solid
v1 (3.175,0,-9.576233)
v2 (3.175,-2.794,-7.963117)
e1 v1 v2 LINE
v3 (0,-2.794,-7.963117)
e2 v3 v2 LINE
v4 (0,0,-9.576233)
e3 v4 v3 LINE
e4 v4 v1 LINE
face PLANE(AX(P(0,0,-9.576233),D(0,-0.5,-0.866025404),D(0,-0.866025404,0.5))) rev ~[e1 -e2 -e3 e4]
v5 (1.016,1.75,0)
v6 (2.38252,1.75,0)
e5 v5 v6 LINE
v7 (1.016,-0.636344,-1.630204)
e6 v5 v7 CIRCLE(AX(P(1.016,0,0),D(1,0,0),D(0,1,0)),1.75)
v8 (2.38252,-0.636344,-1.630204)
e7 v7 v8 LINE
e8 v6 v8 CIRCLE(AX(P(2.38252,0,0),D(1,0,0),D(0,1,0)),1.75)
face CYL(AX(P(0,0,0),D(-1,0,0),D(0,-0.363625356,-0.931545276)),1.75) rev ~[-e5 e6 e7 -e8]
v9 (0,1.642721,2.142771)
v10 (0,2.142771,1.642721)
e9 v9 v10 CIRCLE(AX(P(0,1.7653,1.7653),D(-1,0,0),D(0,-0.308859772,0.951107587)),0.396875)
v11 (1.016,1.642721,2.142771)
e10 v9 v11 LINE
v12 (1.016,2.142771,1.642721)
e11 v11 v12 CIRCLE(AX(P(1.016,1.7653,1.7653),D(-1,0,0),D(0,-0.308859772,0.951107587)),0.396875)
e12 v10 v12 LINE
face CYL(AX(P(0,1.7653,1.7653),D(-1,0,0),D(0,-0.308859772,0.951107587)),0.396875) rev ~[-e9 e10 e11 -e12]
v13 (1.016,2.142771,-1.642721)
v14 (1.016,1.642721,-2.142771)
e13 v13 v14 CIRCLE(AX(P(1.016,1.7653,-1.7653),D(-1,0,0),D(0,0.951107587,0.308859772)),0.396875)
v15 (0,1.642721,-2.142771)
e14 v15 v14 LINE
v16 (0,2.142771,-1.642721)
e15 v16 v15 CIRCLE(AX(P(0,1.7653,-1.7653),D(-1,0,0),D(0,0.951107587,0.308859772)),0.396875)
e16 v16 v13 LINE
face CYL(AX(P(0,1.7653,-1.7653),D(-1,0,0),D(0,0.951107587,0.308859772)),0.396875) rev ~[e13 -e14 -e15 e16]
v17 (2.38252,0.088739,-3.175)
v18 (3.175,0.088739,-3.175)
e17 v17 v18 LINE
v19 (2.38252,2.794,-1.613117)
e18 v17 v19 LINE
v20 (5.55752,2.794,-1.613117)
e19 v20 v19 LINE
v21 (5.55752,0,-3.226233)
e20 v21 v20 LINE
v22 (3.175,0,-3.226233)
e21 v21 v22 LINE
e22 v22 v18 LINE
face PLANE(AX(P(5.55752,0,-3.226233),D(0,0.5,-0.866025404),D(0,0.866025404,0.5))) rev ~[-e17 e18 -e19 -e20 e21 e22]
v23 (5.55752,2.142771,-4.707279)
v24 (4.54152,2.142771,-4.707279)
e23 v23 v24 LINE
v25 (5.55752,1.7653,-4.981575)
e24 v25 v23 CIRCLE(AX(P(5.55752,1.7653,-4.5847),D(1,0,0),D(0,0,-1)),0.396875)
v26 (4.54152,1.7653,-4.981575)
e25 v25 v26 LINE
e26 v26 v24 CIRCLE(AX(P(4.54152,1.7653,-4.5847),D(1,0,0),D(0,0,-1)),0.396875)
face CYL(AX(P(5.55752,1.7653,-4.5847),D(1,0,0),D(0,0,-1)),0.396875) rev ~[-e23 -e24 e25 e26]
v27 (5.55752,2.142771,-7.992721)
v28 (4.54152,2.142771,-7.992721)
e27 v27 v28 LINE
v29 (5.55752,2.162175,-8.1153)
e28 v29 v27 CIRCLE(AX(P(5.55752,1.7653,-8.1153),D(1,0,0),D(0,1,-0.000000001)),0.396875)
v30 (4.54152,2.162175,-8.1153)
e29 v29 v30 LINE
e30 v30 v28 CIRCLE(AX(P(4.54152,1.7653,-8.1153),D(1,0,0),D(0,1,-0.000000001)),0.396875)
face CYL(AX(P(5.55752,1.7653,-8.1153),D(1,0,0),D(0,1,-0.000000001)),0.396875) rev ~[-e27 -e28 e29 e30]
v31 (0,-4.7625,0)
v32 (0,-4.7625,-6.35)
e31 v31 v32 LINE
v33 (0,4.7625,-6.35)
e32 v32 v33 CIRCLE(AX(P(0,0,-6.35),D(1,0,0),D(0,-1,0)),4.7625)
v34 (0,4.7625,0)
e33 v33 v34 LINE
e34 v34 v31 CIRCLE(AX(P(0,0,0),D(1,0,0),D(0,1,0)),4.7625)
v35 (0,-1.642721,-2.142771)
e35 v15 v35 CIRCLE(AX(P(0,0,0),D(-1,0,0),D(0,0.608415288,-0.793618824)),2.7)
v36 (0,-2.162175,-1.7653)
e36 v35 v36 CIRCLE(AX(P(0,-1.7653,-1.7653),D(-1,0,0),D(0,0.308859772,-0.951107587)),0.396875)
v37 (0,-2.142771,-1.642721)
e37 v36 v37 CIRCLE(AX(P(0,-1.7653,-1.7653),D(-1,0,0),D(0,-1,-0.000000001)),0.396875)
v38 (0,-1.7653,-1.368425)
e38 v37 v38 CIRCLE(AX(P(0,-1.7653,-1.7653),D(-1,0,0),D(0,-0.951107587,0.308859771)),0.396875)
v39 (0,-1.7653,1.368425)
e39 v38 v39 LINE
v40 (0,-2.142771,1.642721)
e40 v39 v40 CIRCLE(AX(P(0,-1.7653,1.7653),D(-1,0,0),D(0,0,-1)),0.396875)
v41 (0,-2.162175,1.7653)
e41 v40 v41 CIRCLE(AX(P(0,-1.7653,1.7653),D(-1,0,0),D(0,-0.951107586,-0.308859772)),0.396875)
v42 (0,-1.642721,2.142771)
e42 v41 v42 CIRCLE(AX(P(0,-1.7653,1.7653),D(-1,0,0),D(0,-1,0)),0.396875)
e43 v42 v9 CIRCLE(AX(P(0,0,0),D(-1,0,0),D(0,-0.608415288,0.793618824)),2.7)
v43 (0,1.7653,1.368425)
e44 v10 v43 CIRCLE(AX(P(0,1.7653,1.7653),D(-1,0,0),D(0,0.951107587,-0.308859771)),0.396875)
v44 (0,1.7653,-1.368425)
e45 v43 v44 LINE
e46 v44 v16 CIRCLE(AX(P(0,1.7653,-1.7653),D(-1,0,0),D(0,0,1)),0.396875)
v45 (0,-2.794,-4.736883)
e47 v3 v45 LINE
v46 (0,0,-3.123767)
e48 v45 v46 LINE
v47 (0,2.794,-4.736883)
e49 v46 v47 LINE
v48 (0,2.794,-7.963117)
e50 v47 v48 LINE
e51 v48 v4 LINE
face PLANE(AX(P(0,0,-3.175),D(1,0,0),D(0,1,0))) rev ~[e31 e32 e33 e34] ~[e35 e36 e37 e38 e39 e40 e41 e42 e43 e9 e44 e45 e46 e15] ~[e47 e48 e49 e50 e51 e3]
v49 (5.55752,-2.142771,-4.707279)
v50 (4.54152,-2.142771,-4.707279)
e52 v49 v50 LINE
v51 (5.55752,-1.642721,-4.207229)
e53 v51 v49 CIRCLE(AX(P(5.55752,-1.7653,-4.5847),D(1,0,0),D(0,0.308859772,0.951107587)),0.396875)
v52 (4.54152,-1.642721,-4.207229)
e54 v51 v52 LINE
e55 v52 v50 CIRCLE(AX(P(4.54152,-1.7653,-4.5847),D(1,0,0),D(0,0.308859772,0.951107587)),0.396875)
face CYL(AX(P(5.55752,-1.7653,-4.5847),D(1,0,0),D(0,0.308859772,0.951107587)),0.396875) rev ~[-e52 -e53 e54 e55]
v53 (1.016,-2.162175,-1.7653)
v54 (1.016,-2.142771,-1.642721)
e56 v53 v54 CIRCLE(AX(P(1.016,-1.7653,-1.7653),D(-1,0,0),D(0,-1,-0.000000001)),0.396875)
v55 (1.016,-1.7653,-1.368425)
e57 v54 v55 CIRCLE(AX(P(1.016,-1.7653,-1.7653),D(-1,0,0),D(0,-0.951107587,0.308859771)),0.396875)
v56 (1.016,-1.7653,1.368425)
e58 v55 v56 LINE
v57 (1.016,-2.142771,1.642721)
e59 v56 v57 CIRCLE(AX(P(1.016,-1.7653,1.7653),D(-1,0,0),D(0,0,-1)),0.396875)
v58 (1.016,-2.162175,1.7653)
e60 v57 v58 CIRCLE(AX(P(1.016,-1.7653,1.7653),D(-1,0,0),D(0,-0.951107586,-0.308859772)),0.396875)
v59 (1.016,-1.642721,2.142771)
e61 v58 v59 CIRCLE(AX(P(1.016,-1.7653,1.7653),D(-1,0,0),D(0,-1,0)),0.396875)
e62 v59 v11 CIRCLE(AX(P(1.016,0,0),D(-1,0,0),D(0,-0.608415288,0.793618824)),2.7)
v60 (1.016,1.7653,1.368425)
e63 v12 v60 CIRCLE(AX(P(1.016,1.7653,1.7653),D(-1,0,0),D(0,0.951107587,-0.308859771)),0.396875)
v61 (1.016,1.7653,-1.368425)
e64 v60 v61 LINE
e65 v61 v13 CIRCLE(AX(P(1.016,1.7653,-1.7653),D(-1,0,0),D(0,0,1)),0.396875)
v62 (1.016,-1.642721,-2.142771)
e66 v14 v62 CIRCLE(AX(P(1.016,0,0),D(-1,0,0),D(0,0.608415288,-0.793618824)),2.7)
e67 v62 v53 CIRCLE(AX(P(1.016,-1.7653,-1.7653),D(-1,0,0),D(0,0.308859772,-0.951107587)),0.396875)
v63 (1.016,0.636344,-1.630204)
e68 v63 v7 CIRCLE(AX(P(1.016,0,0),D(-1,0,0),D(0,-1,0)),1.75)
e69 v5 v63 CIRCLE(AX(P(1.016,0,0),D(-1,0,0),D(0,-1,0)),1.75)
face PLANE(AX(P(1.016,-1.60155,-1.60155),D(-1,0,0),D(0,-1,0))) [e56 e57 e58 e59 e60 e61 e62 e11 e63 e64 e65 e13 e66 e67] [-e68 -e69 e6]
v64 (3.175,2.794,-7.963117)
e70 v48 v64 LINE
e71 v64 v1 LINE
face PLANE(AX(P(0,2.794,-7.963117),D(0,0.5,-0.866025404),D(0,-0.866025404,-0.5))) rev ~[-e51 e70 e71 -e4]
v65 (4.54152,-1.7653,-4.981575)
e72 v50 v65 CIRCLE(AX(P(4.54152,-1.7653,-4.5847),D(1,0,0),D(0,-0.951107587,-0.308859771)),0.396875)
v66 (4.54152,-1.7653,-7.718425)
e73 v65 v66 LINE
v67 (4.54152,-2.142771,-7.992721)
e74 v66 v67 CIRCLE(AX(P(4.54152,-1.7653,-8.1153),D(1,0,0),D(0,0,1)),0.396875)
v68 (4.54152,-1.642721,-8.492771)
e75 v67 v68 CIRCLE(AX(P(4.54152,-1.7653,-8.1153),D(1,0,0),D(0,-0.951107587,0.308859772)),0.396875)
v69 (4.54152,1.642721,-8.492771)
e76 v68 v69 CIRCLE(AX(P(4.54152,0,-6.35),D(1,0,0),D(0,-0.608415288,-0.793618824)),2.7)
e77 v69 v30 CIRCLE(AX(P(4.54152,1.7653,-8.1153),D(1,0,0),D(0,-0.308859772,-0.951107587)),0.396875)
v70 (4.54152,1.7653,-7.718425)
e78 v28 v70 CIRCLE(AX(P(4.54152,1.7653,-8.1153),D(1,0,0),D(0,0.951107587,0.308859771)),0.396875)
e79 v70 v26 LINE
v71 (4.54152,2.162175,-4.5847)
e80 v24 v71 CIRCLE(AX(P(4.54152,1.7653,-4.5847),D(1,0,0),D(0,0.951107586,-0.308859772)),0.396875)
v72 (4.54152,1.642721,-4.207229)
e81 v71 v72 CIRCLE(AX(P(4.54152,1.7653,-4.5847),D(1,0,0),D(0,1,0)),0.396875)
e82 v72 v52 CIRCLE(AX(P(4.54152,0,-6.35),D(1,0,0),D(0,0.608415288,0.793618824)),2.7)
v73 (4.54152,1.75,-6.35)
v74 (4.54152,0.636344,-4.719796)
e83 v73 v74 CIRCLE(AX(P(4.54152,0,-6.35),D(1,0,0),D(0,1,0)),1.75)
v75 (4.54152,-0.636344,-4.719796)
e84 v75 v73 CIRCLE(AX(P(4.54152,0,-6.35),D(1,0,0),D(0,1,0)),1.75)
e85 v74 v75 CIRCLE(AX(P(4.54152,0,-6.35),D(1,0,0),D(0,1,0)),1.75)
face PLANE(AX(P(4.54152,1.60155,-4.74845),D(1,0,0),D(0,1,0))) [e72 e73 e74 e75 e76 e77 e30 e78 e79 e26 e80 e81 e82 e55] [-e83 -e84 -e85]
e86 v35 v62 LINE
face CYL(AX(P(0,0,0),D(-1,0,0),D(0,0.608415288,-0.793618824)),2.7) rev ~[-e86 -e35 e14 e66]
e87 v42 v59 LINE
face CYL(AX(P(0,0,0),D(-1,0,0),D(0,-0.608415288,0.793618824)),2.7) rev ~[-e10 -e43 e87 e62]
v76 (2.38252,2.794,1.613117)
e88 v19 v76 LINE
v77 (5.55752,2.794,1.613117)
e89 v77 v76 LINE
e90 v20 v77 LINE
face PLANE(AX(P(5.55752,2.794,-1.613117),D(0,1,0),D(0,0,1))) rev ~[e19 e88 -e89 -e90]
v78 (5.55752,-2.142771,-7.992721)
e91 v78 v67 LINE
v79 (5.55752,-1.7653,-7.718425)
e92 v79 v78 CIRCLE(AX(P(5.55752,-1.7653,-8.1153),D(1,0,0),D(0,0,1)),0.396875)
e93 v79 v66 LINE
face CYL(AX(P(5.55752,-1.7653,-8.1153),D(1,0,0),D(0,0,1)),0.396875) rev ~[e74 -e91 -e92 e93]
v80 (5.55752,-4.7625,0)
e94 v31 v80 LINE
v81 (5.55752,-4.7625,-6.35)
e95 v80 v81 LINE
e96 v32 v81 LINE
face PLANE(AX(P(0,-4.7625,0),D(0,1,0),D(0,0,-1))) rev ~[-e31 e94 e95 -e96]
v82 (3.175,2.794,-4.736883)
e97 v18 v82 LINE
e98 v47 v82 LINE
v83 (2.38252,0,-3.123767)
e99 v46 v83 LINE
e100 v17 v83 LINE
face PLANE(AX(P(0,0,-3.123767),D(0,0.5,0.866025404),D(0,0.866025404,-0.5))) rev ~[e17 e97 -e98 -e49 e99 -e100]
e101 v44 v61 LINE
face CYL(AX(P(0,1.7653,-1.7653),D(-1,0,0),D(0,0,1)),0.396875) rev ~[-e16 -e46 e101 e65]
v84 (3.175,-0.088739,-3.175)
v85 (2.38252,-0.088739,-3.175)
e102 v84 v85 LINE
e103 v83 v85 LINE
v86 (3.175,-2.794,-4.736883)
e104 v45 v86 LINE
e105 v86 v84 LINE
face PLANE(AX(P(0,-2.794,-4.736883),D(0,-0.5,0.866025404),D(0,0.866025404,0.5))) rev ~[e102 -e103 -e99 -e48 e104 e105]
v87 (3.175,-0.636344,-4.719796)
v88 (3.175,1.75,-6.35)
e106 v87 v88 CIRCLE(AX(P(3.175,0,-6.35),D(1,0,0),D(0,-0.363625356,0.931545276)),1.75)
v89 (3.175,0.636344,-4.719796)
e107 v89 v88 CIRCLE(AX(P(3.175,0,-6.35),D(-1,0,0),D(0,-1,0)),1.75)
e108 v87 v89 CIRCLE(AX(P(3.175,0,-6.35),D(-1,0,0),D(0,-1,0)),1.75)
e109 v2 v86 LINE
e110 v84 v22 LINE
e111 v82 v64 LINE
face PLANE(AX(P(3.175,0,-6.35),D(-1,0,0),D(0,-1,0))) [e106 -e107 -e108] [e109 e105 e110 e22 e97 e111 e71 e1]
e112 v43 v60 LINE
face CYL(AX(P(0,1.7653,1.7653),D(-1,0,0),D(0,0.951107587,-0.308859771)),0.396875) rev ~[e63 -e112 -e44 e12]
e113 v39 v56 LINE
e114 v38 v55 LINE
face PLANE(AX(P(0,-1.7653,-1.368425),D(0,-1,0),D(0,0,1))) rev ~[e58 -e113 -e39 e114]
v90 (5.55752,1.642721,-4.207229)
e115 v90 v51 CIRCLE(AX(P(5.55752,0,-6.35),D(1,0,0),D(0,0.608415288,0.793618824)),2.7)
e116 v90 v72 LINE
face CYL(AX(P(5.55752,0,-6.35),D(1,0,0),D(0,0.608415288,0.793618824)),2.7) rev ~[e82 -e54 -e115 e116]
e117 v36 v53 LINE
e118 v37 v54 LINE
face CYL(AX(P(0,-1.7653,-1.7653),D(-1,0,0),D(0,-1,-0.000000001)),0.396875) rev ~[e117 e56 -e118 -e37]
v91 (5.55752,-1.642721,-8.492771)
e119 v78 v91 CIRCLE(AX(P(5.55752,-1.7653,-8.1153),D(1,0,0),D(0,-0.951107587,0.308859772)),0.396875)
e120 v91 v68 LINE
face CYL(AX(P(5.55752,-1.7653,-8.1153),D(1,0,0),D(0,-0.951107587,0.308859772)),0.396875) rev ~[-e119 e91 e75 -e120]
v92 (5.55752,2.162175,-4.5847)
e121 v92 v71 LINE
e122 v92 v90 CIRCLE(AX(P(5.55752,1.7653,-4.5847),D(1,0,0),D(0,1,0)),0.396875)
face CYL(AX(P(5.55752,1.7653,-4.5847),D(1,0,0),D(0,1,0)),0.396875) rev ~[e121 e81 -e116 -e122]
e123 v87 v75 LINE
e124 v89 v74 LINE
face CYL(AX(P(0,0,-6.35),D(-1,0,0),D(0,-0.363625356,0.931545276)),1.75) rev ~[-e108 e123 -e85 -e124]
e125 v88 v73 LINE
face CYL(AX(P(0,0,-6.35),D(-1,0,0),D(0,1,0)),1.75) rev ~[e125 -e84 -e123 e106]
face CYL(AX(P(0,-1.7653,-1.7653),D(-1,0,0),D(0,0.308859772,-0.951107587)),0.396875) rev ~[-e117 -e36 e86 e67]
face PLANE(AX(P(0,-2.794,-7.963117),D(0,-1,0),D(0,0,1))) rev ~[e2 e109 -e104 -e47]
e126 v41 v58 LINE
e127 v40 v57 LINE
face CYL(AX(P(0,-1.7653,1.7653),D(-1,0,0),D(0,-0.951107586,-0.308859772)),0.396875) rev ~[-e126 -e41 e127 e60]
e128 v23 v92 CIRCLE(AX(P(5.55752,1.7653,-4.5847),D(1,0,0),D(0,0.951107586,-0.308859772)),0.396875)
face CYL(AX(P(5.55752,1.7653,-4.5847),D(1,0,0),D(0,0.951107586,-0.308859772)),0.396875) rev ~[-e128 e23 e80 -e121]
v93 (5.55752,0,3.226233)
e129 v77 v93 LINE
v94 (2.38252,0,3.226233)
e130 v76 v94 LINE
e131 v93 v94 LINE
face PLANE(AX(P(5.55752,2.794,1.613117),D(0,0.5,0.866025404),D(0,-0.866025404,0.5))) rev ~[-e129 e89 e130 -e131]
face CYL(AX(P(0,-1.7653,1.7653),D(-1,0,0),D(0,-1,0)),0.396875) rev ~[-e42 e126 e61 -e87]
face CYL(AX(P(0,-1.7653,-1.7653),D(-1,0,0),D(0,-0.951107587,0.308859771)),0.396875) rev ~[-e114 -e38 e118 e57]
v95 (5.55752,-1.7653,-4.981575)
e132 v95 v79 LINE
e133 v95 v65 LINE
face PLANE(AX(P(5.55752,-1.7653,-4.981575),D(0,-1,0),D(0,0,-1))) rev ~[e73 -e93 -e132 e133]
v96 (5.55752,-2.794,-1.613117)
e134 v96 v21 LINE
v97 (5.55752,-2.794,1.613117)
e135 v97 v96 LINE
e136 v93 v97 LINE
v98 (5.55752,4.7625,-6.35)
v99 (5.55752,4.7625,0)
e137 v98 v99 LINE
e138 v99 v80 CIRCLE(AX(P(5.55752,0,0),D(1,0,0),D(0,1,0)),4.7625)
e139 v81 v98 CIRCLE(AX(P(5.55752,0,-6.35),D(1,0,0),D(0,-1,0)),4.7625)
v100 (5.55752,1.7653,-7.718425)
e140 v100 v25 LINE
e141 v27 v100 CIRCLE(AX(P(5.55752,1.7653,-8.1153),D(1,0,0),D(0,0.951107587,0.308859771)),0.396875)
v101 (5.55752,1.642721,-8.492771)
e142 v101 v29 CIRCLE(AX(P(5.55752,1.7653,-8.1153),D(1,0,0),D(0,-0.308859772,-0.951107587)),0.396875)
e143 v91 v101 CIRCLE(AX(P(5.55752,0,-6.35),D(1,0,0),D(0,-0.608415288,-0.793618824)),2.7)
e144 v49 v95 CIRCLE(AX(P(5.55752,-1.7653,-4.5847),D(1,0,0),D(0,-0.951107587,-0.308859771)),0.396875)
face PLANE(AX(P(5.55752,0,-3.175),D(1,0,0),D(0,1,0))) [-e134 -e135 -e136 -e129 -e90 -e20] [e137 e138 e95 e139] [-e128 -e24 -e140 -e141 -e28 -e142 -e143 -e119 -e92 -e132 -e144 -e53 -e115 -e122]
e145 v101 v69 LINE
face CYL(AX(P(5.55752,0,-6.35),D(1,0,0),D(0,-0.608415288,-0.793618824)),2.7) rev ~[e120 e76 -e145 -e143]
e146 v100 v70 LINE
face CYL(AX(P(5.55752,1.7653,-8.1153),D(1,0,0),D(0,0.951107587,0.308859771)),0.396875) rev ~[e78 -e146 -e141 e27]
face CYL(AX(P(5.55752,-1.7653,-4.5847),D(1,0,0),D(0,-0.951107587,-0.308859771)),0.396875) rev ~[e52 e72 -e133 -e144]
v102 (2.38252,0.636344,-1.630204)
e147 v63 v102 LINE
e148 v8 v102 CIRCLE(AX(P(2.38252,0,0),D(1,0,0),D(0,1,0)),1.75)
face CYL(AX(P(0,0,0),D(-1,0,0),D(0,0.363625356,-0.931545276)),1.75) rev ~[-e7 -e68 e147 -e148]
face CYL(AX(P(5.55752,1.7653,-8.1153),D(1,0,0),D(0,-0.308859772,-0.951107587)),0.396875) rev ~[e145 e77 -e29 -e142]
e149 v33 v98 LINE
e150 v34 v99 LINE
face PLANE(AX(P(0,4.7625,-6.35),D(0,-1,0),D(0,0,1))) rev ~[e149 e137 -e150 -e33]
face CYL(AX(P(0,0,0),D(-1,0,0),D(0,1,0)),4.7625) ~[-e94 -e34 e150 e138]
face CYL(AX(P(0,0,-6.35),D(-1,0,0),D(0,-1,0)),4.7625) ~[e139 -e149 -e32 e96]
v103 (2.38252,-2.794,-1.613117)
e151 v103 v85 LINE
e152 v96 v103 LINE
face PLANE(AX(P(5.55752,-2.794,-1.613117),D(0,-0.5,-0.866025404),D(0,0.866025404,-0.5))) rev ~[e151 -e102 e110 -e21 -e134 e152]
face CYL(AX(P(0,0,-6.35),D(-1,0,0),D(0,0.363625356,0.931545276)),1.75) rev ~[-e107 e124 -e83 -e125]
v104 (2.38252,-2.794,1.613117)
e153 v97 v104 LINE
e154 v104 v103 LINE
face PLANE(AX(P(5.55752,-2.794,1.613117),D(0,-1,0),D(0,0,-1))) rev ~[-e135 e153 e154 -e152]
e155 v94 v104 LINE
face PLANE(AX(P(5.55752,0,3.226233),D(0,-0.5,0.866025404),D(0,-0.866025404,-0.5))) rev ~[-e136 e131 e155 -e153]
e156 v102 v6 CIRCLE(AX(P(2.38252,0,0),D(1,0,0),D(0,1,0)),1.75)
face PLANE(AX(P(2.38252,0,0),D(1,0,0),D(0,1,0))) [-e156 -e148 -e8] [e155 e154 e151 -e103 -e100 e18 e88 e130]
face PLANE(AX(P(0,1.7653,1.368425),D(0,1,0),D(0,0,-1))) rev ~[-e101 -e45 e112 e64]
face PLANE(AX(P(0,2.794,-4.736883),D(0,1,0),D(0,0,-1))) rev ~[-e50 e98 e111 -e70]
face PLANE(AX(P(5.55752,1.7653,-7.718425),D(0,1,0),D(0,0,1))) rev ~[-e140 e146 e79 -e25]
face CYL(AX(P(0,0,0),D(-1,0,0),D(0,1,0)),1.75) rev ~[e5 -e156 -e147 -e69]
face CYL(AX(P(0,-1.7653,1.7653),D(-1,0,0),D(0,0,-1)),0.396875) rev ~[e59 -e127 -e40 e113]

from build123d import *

# Parameters (mm, degrees)
F1_DEPTH = 5.55752
F2_R     = 1.75
F3_DEPTH = 1.016
F4_R     = 1.75
F5_DEPTH = 1.016
F6_DEPTH = 3.175
F7_DEPTH = 3.175


# Not quite as in the source:
# - a feature names something its author has since deleted; it is built from what else it names


with BuildPart() as f1:
    # F0 (on Right) → F1 (new body)
    with BuildSketch(Plane.YZ):
        with BuildLine():
            ThreePointArc((0.636344373, -4.7197957677), (2.2310225415, -4.2076055743), (3.5497579143, -3.175))
            ThreePointArc((3.5497579143, -3.175), (2.2310225415, -2.1423944257), (0.636344373, -1.6302042323))
            ThreePointArc((0.636344373, -1.6302042323), (0, -1.75), (-0.636344373, -1.6302042323))
            ThreePointArc((-0.636344373, -1.6302042323), (-2.2310225415, -2.1423944257), (-3.5497579143, -3.175))
            ThreePointArc((-3.5497579143, -3.175), (-2.2310225415, -4.2076055743), (-0.636344373, -4.7197957677))
            ThreePointArc((-0.636344373, -4.7197957677), (0, -4.6), (0.636344373, -4.7197957677))
        make_face()
        with BuildLine():
            ThreePointArc((3.5497579143, -3.175), (4.4489958596, -1.6993652025), (4.7625, 0))
            ThreePointArc((4.7625, 0), (0, 4.7625), (-4.7625, 0))
            ThreePointArc((-4.7625, 0), (-4.4489958596, -1.6993652025), (-3.5497579143, -3.175))
            ThreePointArc((-3.5497579143, -3.175), (-2.2310225415, -2.1423944257), (-0.636344373, -1.6302042323))
            ThreePointArc((-0.636344373, -1.6302042323), (-0.9871416685, 1.4450091094), (1.75, 0))
            ThreePointArc((1.75, 0), (1.4450091094, -0.9871416685), (0.636344373, -1.6302042323))
            ThreePointArc((0.636344373, -1.6302042323), (2.2310225415, -2.1423944257), (3.5497579143, -3.175))
        make_face()
        with BuildLine():
            Line((4.7625, -6.35), (4.7625, 0))
            ThreePointArc((4.7625, 0), (4.4489958596, -1.6993652025), (3.5497579143, -3.175))
            ThreePointArc((3.5497579143, -3.175), (4.4489958596, -4.6506347975), (4.7625, -6.35))
        make_face()
        with BuildLine():
            ThreePointArc((4.7625, -6.35), (4.4489958596, -4.6506347975), (3.5497579143, -3.175))
            ThreePointArc((3.5497579143, -3.175), (2.2310225415, -4.2076055743), (0.636344373, -4.7197957677))
            ThreePointArc((0.636344373, -4.7197957677), (1.4450091094, -5.3628583315), (1.75, -6.35))
            ThreePointArc((1.75, -6.35), (-0.9871416685, -7.7950091094), (-0.636344373, -4.7197957677))
            ThreePointArc((-0.636344373, -4.7197957677), (-2.2310225415, -4.2076055743), (-3.5497579143, -3.175))
            ThreePointArc((-3.5497579143, -3.175), (-4.4489958596, -4.6506347975), (-4.7625, -6.35))
            ThreePointArc((-4.7625, -6.35), (0, -11.1125), (4.7625, -6.35))
        make_face()
        with BuildLine():
            ThreePointArc((-3.5497579143, -3.175), (-4.4489958596, -1.6993652025), (-4.7625, 0))
            Line((-4.7625, 0), (-4.7625, -6.35))
            ThreePointArc((-4.7625, -6.35), (-4.4489958596, -4.6506347975), (-3.5497579143, -3.175))
        make_face()
    extrude(amount=F1_DEPTH)

    # F2 (on face) → F3 (cut)
    with BuildSketch(Plane.YZ.offset(5.55752)):
        with BuildLine():
            ThreePointArc((1.368425, -4.5847), (1.4846669962, -4.8653330038), (1.7653, -4.981575))
            Line((1.7653, -4.981575), (1.7653, -4.5847))
            Line((1.7653, -4.5847), (1.368425, -4.5847))
        make_face()
        with BuildLine():
            Line((1.7653, -4.5847), (1.7653, -4.981575))
            ThreePointArc((1.7653, -4.981575), (1.9986038099, -4.9057593371), (2.1427708235, -4.7072787218))
            ThreePointArc((2.1427708235, -4.7072787218), (1.9091883092, -4.4408116908), (1.6427212782, -4.2072291765))
            ThreePointArc((1.6427212782, -4.2072291765), (1.4442406629, -4.3513961901), (1.368425, -4.5847))
            Line((1.368425, -4.5847), (1.7653, -4.5847))
        make_face()
        with BuildLine():
            ThreePointArc((1.7653, -7.718425), (1.4846669962, -7.8346669962), (1.368425, -8.1153))
            Line((1.368425, -8.1153), (1.7653, -8.1153))
            Line((1.7653, -8.1153), (1.7653, -7.718425))
        make_face()
        with BuildLine():
            Line((1.7653, -8.1153), (1.368425, -8.1153))
            ThreePointArc((1.368425, -8.1153), (1.4442406629, -8.3486038099), (1.6427212782, -8.4927708235))
            ThreePointArc((1.6427212782, -8.4927708235), (1.9091883092, -8.2591883092), (2.1427708235, -7.9927212782))
            ThreePointArc((2.1427708235, -7.9927212782), (1.9986038099, -7.7942406629), (1.7653, -7.718425))
            Line((1.7653, -7.718425), (1.7653, -8.1153))
        make_face()
        with BuildLine():
            Line((-1.368425, -8.1153), (-1.7653, -8.1153))
            Line((-1.7653, -8.1153), (-1.7653, -7.718425))
            ThreePointArc((-1.7653, -7.718425), (-1.9986038099, -7.7942406629), (-2.1427708235, -7.9927212782))
            ThreePointArc((-2.1427708235, -7.9927212782), (-1.9091883092, -8.2591883092), (-1.6427212782, -8.4927708235))
            ThreePointArc((-1.6427212782, -8.4927708235), (-1.4442406629, -8.3486038099), (-1.368425, -8.1153))
        make_face()
        with BuildLine():
            Line((-1.7653, -7.718425), (-1.7653, -8.1153))
            Line((-1.7653, -8.1153), (-1.368425, -8.1153))
            ThreePointArc((-1.368425, -8.1153), (-1.4846669962, -7.8346669962), (-1.7653, -7.718425))
        make_face()
        with BuildLine():
            Line((-1.7653, -4.5847), (-1.7653, -4.981575))
            ThreePointArc((-1.7653, -4.981575), (-1.4846669962, -4.8653330038), (-1.368425, -4.5847))
            Line((-1.368425, -4.5847), (-1.7653, -4.5847))
        make_face()
        with BuildLine():
            ThreePointArc((-2.1427708235, -4.7072787218), (-1.9986038099, -4.9057593371), (-1.7653, -4.981575))
            Line((-1.7653, -4.981575), (-1.7653, -4.5847))
            Line((-1.7653, -4.5847), (-1.368425, -4.5847))
            ThreePointArc((-1.368425, -4.5847), (-1.4442406629, -4.3513961901), (-1.6427212782, -4.2072291765))
            ThreePointArc((-1.6427212782, -4.2072291765), (-1.9091883092, -4.4408116908), (-2.1427708235, -4.7072787218))
        make_face()
        with BuildLine():
            ThreePointArc((-1.7653, -7.718425), (-1.4846669962, -7.8346669962), (-1.368425, -8.1153))
            Line((-1.368425, -8.1153), (1.368425, -8.1153))
            ThreePointArc((1.368425, -8.1153), (1.4846669962, -7.8346669962), (1.7653, -7.718425))
            Line((1.7653, -7.718425), (1.7653, -4.981575))
            ThreePointArc((1.7653, -4.981575), (1.4846669962, -4.8653330038), (1.368425, -4.5847))
            Line((1.368425, -4.5847), (-1.368425, -4.5847))
            ThreePointArc((-1.368425, -4.5847), (-1.4846669962, -4.8653330038), (-1.7653, -4.981575))
            Line((-1.7653, -4.981575), (-1.7653, -7.718425))
        make_face()
        with Locations((0, -6.35)):
            Circle(F2_R, mode=Mode.SUBTRACT)
        with BuildLine():
            ThreePointArc((-1.6427212782, -4.2072291765), (-2.0459330038, -4.3040669962), (-2.1427708235, -4.7072787218))
            ThreePointArc((-2.1427708235, -4.7072787218), (-1.9091883092, -4.4408116908), (-1.6427212782, -4.2072291765))
        make_face()
        with BuildLine():
            ThreePointArc((1.6427212782, -4.2072291765), (1.9091883092, -4.4408116908), (2.1427708235, -4.7072787218))
            ThreePointArc((2.1427708235, -4.7072787218), (2.1572939405, -4.6467525283), (2.162175, -4.5847))
            ThreePointArc((2.162175, -4.5847), (1.9986038099, -4.2636406629), (1.6427212782, -4.2072291765))
        make_face()
        with BuildLine():
            ThreePointArc((2.1427708235, -7.9927212782), (1.9091883092, -8.2591883092), (1.6427212782, -8.4927708235))
            ThreePointArc((1.6427212782, -8.4927708235), (1.9986038099, -8.4363593371), (2.162175, -8.1153))
            ThreePointArc((2.162175, -8.1153), (2.1572939405, -8.0532474717), (2.1427708235, -7.9927212782))
        make_face()
        with BuildLine():
            ThreePointArc((-2.1427708235, -7.9927212782), (-2.0459330038, -8.3959330038), (-1.6427212782, -8.4927708235))
            ThreePointArc((-1.6427212782, -8.4927708235), (-1.9091883092, -8.2591883092), (-2.1427708235, -7.9927212782))
        make_face()
        with BuildLine():
            ThreePointArc((-1.6427212782, -4.2072291765), (-1.4442406629, -4.3513961901), (-1.368425, -4.5847))
            Line((-1.368425, -4.5847), (1.368425, -4.5847))
            ThreePointArc((1.368425, -4.5847), (1.4442406629, -4.3513961901), (1.6427212782, -4.2072291765))
            ThreePointArc((1.6427212782, -4.2072291765), (0, -3.65), (-1.6427212782, -4.2072291765))
        make_face()
        with BuildLine():
            Line((1.368425, -8.1153), (-1.368425, -8.1153))
            ThreePointArc((-1.368425, -8.1153), (-1.4442406629, -8.3486038099), (-1.6427212782, -8.4927708235))
            ThreePointArc((-1.6427212782, -8.4927708235), (0, -9.05), (1.6427212782, -8.4927708235))
            ThreePointArc((1.6427212782, -8.4927708235), (1.4442406629, -8.3486038099), (1.368425, -8.1153))
        make_face()
    extrude(amount=-F3_DEPTH, mode=Mode.SUBTRACT)

    # F4 (on face) → F5 (cut)
    with BuildSketch(Plane(origin=(0, 0, 0), x_dir=(0, -1, 0), z_dir=(-1, 0, 0))):
        with BuildLine():
            ThreePointArc((1.7653, -1.368425), (1.4846669962, -1.4846669962), (1.368425, -1.7653))
            Line((1.368425, -1.7653), (1.7653, -1.7653))
            Line((1.7653, -1.7653), (1.7653, -1.368425))
        make_face()
        with BuildLine():
            Line((1.7653, -1.7653), (1.368425, -1.7653))
            ThreePointArc((1.368425, -1.7653), (1.4442406629, -1.9986038099), (1.6427212782, -2.1427708235))
            ThreePointArc((1.6427212782, -2.1427708235), (1.9091883092, -1.9091883092), (2.1427708235, -1.6427212782))
            ThreePointArc((2.1427708235, -1.6427212782), (1.9986038099, -1.4442406629), (1.7653, -1.368425))
            Line((1.7653, -1.368425), (1.7653, -1.7653))
        make_face()
        with BuildLine():
            Line((-1.7653, -1.368425), (-1.7653, -1.7653))
            Line((-1.7653, -1.7653), (-1.368425, -1.7653))
            ThreePointArc((-1.368425, -1.7653), (-1.4846669962, -1.4846669962), (-1.7653, -1.368425))
        make_face()
        with BuildLine():
            Line((-1.368425, -1.7653), (-1.7653, -1.7653))
            Line((-1.7653, -1.7653), (-1.7653, -1.368425))
            ThreePointArc((-1.7653, -1.368425), (-1.9986038099, -1.4442406629), (-2.1427708235, -1.6427212782))
            ThreePointArc((-2.1427708235, -1.6427212782), (-1.9091883092, -1.9091883092), (-1.6427212782, -2.1427708235))
            ThreePointArc((-1.6427212782, -2.1427708235), (-1.4442406629, -1.9986038099), (-1.368425, -1.7653))
        make_face()
        with BuildLine():
            Line((-1.7653, 1.7653), (-1.7653, 1.368425))
            ThreePointArc((-1.7653, 1.368425), (-1.4846669962, 1.4846669962), (-1.368425, 1.7653))
            Line((-1.368425, 1.7653), (-1.7653, 1.7653))
        make_face()
        with BuildLine():
            ThreePointArc((-2.1427708235, 1.6427212782), (-1.9986038099, 1.4442406629), (-1.7653, 1.368425))
            Line((-1.7653, 1.368425), (-1.7653, 1.7653))
            Line((-1.7653, 1.7653), (-1.368425, 1.7653))
            ThreePointArc((-1.368425, 1.7653), (-1.4442406629, 1.9986038099), (-1.6427212782, 2.1427708235))
            ThreePointArc((-1.6427212782, 2.1427708235), (-1.9091883092, 1.9091883092), (-2.1427708235, 1.6427212782))
        make_face()
        with BuildLine():
            ThreePointArc((1.368425, 1.7653), (1.4846669962, 1.4846669962), (1.7653, 1.368425))
            Line((1.7653, 1.368425), (1.7653, 1.7653))
            Line((1.7653, 1.7653), (1.368425, 1.7653))
        make_face()
        with BuildLine():
            Line((1.7653, 1.7653), (1.7653, 1.368425))
            ThreePointArc((1.7653, 1.368425), (1.9986038099, 1.4442406629), (2.1427708235, 1.6427212782))
            ThreePointArc((2.1427708235, 1.6427212782), (1.9091883092, 1.9091883092), (1.6427212782, 2.1427708235))
            ThreePointArc((1.6427212782, 2.1427708235), (1.4442406629, 1.9986038099), (1.368425, 1.7653))
            Line((1.368425, 1.7653), (1.7653, 1.7653))
        make_face()
        with BuildLine():
            ThreePointArc((-1.7653, -1.368425), (-1.4846669962, -1.4846669962), (-1.368425, -1.7653))
            Line((-1.368425, -1.7653), (1.368425, -1.7653))
            ThreePointArc((1.368425, -1.7653), (1.4846669962, -1.4846669962), (1.7653, -1.368425))
            Line((1.7653, -1.368425), (1.7653, 1.368425))
            ThreePointArc((1.7653, 1.368425), (1.4846669962, 1.4846669962), (1.368425, 1.7653))
            Line((1.368425, 1.7653), (-1.368425, 1.7653))
            ThreePointArc((-1.368425, 1.7653), (-1.4846669962, 1.4846669962), (-1.7653, 1.368425))
            Line((-1.7653, 1.368425), (-1.7653, -1.368425))
        make_face()
        Circle(F4_R, mode=Mode.SUBTRACT)
        with BuildLine():
            ThreePointArc((-1.6427212782, 2.1427708235), (-2.0459330038, 2.0459330038), (-2.1427708235, 1.6427212782))
            ThreePointArc((-2.1427708235, 1.6427212782), (-1.9091883092, 1.9091883092), (-1.6427212782, 2.1427708235))
        make_face()
        with BuildLine():
            ThreePointArc((1.6427212782, 2.1427708235), (1.9091883092, 1.9091883092), (2.1427708235, 1.6427212782))
            ThreePointArc((2.1427708235, 1.6427212782), (2.1572939405, 1.7032474717), (2.162175, 1.7653))
            ThreePointArc((2.162175, 1.7653), (1.9986038099, 2.0863593371), (1.6427212782, 2.1427708235))
        make_face()
        with BuildLine():
            ThreePointArc((2.1427708235, -1.6427212782), (1.9091883092, -1.9091883092), (1.6427212782, -2.1427708235))
            ThreePointArc((1.6427212782, -2.1427708235), (1.9986038099, -2.0863593371), (2.162175, -1.7653))
            ThreePointArc((2.162175, -1.7653), (2.1572939405, -1.7032474717), (2.1427708235, -1.6427212782))
        make_face()
        with BuildLine():
            ThreePointArc((-2.1427708235, -1.6427212782), (-2.0459330038, -2.0459330038), (-1.6427212782, -2.1427708235))
            ThreePointArc((-1.6427212782, -2.1427708235), (-1.9091883092, -1.9091883092), (-2.1427708235, -1.6427212782))
        make_face()
        with BuildLine():
            ThreePointArc((-1.6427212782, 2.1427708235), (-1.4442406629, 1.9986038099), (-1.368425, 1.7653))
            Line((-1.368425, 1.7653), (1.368425, 1.7653))
            ThreePointArc((1.368425, 1.7653), (1.4442406629, 1.9986038099), (1.6427212782, 2.1427708235))
            ThreePointArc((1.6427212782, 2.1427708235), (0, 2.7), (-1.6427212782, 2.1427708235))
        make_face()
        with BuildLine():
            Line((1.368425, -1.7653), (-1.368425, -1.7653))
            ThreePointArc((-1.368425, -1.7653), (-1.4442406629, -1.9986038099), (-1.6427212782, -2.1427708235))
            ThreePointArc((-1.6427212782, -2.1427708235), (0, -2.7), (1.6427212782, -2.1427708235))
            ThreePointArc((1.6427212782, -2.1427708235), (1.4442406629, -1.9986038099), (1.368425, -1.7653))
        make_face()
    extrude(amount=-F5_DEPTH, mode=Mode.SUBTRACT)

    # F2 (on face) → F6 (cut)
    with BuildSketch(Plane.YZ.offset(5.55752)):
        Polygon((-2.794, -1.6131166521), (0, -3.2262333042), (2.794, -1.6131166521), (2.794, 1.6131166521), (0, 3.2262333042), (-2.794, 1.6131166521), align=None)
        Circle(F2_R, mode=Mode.SUBTRACT)
    extrude(amount=-F6_DEPTH, mode=Mode.SUBTRACT)

    # F4 (on face) → F7 (cut)
    with BuildSketch(Plane(origin=(0, 0, 0), x_dir=(0, -1, 0), z_dir=(-1, 0, 0))):
        Polygon((-2.794, -7.9631166521), (0, -9.5762333042), (2.794, -7.9631166521), (2.794, -4.7368833479), (0, -3.1237666958), (-2.794, -4.7368833479), align=None)
        with Locations((0, -6.35)):
            Circle(F4_R, mode=Mode.SUBTRACT)
    extrude(amount=-F7_DEPTH, mode=Mode.SUBTRACT)


solid = f1.part
